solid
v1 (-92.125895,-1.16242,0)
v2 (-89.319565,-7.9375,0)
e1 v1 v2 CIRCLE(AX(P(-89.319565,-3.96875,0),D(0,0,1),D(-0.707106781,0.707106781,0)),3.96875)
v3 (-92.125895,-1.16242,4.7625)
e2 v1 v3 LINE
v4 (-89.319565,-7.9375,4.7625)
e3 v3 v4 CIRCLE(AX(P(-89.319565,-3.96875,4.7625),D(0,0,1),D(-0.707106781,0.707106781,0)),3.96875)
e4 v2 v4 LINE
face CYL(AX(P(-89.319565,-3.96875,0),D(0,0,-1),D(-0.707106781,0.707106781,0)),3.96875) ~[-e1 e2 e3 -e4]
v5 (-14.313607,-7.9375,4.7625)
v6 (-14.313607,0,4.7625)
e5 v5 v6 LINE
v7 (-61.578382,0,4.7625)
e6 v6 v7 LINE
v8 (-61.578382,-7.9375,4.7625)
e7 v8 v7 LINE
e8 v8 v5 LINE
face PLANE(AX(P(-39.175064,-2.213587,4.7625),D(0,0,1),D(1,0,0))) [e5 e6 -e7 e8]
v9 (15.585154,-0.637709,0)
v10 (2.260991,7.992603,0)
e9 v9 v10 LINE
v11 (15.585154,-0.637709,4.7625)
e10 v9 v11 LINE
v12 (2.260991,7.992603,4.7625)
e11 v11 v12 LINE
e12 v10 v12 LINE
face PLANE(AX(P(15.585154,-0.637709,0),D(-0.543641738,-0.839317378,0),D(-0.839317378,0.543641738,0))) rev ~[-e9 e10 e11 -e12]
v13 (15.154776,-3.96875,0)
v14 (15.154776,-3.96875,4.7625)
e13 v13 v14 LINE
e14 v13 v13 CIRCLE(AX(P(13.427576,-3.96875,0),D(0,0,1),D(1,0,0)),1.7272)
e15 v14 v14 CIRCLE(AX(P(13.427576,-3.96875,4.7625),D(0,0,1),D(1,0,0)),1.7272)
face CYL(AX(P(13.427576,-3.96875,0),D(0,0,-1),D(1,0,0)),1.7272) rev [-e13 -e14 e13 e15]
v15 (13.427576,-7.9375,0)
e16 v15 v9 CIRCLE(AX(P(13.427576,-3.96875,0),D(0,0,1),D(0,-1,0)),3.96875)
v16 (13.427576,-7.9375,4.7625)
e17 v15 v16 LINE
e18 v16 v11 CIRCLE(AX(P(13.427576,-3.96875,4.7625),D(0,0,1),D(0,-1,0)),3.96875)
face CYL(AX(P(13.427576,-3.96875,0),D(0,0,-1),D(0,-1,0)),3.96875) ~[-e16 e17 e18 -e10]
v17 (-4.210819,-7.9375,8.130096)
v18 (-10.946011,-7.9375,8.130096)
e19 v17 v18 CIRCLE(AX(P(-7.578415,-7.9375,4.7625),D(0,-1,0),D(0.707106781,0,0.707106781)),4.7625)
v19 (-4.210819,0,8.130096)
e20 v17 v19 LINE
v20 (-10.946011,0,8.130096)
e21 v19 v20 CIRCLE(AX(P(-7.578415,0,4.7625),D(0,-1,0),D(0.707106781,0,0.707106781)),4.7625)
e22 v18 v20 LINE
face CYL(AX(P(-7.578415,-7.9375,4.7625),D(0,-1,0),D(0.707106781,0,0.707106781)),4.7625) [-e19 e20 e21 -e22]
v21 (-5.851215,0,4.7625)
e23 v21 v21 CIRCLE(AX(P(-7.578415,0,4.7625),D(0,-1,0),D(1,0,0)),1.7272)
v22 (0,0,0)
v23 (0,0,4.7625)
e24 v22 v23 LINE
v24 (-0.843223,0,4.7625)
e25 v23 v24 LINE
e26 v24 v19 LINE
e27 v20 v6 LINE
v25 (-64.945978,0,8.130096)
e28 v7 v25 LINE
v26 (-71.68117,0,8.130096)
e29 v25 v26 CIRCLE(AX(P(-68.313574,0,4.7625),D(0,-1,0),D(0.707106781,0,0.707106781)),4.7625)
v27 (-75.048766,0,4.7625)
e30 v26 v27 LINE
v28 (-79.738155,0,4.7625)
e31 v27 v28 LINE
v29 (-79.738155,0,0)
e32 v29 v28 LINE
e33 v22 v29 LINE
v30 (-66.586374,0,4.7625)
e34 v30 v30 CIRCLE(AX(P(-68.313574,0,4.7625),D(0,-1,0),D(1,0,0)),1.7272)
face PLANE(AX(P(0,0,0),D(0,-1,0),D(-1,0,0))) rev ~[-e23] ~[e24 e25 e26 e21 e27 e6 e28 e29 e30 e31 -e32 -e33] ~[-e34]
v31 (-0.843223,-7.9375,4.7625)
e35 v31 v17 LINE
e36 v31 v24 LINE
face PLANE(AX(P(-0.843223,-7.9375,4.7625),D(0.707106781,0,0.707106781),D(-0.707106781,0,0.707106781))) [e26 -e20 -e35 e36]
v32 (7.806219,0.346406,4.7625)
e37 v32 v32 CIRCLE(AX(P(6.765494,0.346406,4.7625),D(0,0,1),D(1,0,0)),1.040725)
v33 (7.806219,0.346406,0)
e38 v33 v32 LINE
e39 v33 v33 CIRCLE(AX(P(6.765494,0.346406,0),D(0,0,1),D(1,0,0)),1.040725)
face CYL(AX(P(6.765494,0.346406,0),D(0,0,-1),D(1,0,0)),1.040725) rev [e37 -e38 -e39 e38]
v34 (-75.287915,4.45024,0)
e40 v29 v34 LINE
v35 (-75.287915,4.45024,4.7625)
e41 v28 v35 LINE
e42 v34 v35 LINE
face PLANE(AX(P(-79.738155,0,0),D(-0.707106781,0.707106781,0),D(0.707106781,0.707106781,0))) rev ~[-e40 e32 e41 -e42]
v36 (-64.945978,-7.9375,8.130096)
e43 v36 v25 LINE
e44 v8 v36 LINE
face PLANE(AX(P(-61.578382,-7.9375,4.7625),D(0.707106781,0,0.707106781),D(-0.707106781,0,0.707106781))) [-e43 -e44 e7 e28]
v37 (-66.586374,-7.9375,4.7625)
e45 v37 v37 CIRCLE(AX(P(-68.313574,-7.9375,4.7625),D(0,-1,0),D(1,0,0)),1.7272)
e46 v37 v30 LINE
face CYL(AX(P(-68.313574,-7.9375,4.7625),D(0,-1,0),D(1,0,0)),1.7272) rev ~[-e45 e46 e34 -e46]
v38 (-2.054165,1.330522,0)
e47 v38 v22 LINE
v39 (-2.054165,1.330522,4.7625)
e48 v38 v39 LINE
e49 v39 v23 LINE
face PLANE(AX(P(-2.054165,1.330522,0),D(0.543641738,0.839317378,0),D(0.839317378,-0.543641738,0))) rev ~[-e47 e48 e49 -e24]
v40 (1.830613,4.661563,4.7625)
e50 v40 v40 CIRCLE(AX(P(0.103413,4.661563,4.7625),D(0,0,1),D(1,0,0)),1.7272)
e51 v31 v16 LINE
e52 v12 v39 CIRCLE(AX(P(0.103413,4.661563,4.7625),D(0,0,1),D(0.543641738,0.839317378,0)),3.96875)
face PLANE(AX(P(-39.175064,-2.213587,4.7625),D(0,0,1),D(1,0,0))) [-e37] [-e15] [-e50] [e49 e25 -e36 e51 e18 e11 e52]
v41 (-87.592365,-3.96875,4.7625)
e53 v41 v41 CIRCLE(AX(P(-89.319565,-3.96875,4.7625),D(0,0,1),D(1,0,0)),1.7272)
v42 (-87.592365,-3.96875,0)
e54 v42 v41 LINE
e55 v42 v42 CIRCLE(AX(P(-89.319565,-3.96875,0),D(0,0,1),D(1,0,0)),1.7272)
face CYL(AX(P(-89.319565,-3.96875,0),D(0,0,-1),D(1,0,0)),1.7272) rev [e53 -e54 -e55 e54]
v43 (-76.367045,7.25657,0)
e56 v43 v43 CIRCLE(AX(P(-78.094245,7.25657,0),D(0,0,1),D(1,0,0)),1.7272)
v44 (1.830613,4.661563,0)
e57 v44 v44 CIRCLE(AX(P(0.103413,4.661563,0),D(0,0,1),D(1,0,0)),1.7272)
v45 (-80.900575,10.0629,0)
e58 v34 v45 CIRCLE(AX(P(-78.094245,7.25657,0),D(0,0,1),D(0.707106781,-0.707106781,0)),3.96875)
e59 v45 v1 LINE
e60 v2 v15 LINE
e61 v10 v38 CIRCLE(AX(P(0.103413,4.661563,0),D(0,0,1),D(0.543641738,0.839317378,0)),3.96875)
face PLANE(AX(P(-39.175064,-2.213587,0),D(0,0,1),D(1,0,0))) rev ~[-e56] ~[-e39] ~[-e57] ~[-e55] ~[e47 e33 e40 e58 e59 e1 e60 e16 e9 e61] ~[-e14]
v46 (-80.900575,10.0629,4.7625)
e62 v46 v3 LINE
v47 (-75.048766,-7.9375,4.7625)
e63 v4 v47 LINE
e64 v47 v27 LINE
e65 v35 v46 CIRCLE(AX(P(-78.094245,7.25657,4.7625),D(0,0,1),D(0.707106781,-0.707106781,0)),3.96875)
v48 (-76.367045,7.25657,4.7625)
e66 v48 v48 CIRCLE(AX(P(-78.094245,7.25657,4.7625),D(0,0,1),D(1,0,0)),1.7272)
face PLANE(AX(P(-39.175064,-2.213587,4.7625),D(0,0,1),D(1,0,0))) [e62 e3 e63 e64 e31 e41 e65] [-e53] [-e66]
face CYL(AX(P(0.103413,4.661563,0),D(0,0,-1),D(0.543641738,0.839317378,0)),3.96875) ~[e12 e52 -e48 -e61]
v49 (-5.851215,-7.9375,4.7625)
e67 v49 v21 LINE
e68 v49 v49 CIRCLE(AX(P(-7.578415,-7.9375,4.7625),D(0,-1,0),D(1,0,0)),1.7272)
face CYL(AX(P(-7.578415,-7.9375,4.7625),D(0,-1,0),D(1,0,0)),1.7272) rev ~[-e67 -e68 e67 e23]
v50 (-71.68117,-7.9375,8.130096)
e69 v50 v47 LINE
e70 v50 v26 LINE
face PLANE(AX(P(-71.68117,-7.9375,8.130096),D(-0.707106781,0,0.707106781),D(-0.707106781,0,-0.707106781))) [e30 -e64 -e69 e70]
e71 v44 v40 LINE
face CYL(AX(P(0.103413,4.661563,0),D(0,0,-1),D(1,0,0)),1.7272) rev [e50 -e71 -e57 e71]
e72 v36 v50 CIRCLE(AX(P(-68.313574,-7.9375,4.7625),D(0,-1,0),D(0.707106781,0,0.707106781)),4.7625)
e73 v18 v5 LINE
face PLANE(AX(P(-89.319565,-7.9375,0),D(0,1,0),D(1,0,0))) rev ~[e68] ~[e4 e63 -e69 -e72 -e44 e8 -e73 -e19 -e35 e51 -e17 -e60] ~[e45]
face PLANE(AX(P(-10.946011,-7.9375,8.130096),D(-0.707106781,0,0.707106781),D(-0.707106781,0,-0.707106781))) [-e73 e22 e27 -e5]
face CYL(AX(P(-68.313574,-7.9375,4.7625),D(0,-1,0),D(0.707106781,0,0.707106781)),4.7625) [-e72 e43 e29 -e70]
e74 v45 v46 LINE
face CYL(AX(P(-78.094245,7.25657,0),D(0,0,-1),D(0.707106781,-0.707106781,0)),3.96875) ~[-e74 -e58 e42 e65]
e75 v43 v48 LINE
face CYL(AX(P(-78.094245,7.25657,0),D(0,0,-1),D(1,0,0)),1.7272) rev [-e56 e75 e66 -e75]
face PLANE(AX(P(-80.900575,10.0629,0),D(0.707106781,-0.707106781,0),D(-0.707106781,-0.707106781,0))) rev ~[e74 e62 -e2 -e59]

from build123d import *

# Parameters (mm, degrees)
F0_R     = 1.7272
F0_R_2   = 1.0407250193
F1_DEPTH = 4.7625
F3_DEPTH = 7.9375
F4_R     = 1.7272
F5_DEPTH = 7.9375


with BuildPart() as f1:
    # F0 (on Top) → F1 (new body)
    with BuildSketch(Plane.XY):
        with BuildLine():
            Line((-2.0541653616, 1.330521752), (0, 0))
            Line((0, 0), (-79.738154648, 0))
            Line((-79.738154648, 0), (-75.2879145345, 4.4502401135))
            ThreePointArc((-75.2879145345, 4.4502401135), (-75.2879145345, 10.0629001892), (-80.9005746101, 10.0629001892))
            Line((-80.9005746101, 10.0629001892), (-92.1258947615, -1.1624199622))
            ThreePointArc((-92.1258947615, -1.1624199622), (-92.9862116183, -5.4875248722), (-89.3195647236, -7.9375))
            Line((-89.3195647236, -7.9375), (13.4275761574, -7.9375))
            ThreePointArc((13.4275761574, -7.9375), (17.2335612406, -5.093674046), (15.5851543061, -0.6377091574))
            Line((15.5851543061, -0.6377091574), (2.2609909357, 7.9926034372))
            ThreePointArc((2.2609909357, 7.9926034372), (-3.2276280555, 6.8191407432), (-2.0541653616, 1.330521752))
        make_face()
        with Locations((-89.3195647236, -3.96875)):
            Circle(F0_R, mode=Mode.SUBTRACT)
        with Locations((13.4275761574, -3.96875)):
            Circle(F0_R, mode=Mode.SUBTRACT)
        with Locations((6.7654944722, 0.3464062973)):
            Circle(F0_R_2, mode=Mode.SUBTRACT)
        with Locations((-78.0942445723, 7.2565701513)):
            Circle(F0_R, mode=Mode.SUBTRACT)
        with Locations((0.1034127871, 4.6615625946)):
            Circle(F0_R, mode=Mode.SUBTRACT)
    extrude(amount=F1_DEPTH)

    # F2 (on face) → F3 (join, through all)
    with BuildSketch(Plane.XZ.offset(7.9375)):
        with BuildLine():
            Line((-75.0487659739, 4.7625), (-68.3135738831, 4.7625))
            Line((-68.3135738831, 4.7625), (-61.5783817923, 4.7625))
            Line((-61.5783817923, 4.7625), (-64.9459778377, 8.1300960454))
            ThreePointArc((-64.9459778377, 8.1300960454), (-68.3135738831, 9.525), (-71.6811699285, 8.1300960454))
            Line((-71.6811699285, 8.1300960454), (-75.0487659739, 4.7625))
        make_face()
        with BuildLine():
            Line((-14.3136067739, 4.7625), (-7.5784146831, 4.7625))
            Line((-7.5784146831, 4.7625), (-0.8432225923, 4.7625))
            Line((-0.8432225923, 4.7625), (-4.2108186377, 8.1300960454))
            ThreePointArc((-4.2108186377, 8.1300960454), (-7.5784146831, 9.525), (-10.9460107285, 8.1300960454))
            Line((-10.9460107285, 8.1300960454), (-14.3136067739, 4.7625))
        make_face()
    extrude(amount=-F3_DEPTH)

    # F4 (on face) → F5 (cut, through all)
    with BuildSketch(Plane.XZ.offset(7.9375)):
        with Locations((-68.3135738831, 4.7625)):
            Circle(F4_R)
        with Locations((-7.5784146831, 4.7625)):
            Circle(F4_R)
    extrude(amount=-F5_DEPTH, mode=Mode.SUBTRACT)


solid = f1.part
